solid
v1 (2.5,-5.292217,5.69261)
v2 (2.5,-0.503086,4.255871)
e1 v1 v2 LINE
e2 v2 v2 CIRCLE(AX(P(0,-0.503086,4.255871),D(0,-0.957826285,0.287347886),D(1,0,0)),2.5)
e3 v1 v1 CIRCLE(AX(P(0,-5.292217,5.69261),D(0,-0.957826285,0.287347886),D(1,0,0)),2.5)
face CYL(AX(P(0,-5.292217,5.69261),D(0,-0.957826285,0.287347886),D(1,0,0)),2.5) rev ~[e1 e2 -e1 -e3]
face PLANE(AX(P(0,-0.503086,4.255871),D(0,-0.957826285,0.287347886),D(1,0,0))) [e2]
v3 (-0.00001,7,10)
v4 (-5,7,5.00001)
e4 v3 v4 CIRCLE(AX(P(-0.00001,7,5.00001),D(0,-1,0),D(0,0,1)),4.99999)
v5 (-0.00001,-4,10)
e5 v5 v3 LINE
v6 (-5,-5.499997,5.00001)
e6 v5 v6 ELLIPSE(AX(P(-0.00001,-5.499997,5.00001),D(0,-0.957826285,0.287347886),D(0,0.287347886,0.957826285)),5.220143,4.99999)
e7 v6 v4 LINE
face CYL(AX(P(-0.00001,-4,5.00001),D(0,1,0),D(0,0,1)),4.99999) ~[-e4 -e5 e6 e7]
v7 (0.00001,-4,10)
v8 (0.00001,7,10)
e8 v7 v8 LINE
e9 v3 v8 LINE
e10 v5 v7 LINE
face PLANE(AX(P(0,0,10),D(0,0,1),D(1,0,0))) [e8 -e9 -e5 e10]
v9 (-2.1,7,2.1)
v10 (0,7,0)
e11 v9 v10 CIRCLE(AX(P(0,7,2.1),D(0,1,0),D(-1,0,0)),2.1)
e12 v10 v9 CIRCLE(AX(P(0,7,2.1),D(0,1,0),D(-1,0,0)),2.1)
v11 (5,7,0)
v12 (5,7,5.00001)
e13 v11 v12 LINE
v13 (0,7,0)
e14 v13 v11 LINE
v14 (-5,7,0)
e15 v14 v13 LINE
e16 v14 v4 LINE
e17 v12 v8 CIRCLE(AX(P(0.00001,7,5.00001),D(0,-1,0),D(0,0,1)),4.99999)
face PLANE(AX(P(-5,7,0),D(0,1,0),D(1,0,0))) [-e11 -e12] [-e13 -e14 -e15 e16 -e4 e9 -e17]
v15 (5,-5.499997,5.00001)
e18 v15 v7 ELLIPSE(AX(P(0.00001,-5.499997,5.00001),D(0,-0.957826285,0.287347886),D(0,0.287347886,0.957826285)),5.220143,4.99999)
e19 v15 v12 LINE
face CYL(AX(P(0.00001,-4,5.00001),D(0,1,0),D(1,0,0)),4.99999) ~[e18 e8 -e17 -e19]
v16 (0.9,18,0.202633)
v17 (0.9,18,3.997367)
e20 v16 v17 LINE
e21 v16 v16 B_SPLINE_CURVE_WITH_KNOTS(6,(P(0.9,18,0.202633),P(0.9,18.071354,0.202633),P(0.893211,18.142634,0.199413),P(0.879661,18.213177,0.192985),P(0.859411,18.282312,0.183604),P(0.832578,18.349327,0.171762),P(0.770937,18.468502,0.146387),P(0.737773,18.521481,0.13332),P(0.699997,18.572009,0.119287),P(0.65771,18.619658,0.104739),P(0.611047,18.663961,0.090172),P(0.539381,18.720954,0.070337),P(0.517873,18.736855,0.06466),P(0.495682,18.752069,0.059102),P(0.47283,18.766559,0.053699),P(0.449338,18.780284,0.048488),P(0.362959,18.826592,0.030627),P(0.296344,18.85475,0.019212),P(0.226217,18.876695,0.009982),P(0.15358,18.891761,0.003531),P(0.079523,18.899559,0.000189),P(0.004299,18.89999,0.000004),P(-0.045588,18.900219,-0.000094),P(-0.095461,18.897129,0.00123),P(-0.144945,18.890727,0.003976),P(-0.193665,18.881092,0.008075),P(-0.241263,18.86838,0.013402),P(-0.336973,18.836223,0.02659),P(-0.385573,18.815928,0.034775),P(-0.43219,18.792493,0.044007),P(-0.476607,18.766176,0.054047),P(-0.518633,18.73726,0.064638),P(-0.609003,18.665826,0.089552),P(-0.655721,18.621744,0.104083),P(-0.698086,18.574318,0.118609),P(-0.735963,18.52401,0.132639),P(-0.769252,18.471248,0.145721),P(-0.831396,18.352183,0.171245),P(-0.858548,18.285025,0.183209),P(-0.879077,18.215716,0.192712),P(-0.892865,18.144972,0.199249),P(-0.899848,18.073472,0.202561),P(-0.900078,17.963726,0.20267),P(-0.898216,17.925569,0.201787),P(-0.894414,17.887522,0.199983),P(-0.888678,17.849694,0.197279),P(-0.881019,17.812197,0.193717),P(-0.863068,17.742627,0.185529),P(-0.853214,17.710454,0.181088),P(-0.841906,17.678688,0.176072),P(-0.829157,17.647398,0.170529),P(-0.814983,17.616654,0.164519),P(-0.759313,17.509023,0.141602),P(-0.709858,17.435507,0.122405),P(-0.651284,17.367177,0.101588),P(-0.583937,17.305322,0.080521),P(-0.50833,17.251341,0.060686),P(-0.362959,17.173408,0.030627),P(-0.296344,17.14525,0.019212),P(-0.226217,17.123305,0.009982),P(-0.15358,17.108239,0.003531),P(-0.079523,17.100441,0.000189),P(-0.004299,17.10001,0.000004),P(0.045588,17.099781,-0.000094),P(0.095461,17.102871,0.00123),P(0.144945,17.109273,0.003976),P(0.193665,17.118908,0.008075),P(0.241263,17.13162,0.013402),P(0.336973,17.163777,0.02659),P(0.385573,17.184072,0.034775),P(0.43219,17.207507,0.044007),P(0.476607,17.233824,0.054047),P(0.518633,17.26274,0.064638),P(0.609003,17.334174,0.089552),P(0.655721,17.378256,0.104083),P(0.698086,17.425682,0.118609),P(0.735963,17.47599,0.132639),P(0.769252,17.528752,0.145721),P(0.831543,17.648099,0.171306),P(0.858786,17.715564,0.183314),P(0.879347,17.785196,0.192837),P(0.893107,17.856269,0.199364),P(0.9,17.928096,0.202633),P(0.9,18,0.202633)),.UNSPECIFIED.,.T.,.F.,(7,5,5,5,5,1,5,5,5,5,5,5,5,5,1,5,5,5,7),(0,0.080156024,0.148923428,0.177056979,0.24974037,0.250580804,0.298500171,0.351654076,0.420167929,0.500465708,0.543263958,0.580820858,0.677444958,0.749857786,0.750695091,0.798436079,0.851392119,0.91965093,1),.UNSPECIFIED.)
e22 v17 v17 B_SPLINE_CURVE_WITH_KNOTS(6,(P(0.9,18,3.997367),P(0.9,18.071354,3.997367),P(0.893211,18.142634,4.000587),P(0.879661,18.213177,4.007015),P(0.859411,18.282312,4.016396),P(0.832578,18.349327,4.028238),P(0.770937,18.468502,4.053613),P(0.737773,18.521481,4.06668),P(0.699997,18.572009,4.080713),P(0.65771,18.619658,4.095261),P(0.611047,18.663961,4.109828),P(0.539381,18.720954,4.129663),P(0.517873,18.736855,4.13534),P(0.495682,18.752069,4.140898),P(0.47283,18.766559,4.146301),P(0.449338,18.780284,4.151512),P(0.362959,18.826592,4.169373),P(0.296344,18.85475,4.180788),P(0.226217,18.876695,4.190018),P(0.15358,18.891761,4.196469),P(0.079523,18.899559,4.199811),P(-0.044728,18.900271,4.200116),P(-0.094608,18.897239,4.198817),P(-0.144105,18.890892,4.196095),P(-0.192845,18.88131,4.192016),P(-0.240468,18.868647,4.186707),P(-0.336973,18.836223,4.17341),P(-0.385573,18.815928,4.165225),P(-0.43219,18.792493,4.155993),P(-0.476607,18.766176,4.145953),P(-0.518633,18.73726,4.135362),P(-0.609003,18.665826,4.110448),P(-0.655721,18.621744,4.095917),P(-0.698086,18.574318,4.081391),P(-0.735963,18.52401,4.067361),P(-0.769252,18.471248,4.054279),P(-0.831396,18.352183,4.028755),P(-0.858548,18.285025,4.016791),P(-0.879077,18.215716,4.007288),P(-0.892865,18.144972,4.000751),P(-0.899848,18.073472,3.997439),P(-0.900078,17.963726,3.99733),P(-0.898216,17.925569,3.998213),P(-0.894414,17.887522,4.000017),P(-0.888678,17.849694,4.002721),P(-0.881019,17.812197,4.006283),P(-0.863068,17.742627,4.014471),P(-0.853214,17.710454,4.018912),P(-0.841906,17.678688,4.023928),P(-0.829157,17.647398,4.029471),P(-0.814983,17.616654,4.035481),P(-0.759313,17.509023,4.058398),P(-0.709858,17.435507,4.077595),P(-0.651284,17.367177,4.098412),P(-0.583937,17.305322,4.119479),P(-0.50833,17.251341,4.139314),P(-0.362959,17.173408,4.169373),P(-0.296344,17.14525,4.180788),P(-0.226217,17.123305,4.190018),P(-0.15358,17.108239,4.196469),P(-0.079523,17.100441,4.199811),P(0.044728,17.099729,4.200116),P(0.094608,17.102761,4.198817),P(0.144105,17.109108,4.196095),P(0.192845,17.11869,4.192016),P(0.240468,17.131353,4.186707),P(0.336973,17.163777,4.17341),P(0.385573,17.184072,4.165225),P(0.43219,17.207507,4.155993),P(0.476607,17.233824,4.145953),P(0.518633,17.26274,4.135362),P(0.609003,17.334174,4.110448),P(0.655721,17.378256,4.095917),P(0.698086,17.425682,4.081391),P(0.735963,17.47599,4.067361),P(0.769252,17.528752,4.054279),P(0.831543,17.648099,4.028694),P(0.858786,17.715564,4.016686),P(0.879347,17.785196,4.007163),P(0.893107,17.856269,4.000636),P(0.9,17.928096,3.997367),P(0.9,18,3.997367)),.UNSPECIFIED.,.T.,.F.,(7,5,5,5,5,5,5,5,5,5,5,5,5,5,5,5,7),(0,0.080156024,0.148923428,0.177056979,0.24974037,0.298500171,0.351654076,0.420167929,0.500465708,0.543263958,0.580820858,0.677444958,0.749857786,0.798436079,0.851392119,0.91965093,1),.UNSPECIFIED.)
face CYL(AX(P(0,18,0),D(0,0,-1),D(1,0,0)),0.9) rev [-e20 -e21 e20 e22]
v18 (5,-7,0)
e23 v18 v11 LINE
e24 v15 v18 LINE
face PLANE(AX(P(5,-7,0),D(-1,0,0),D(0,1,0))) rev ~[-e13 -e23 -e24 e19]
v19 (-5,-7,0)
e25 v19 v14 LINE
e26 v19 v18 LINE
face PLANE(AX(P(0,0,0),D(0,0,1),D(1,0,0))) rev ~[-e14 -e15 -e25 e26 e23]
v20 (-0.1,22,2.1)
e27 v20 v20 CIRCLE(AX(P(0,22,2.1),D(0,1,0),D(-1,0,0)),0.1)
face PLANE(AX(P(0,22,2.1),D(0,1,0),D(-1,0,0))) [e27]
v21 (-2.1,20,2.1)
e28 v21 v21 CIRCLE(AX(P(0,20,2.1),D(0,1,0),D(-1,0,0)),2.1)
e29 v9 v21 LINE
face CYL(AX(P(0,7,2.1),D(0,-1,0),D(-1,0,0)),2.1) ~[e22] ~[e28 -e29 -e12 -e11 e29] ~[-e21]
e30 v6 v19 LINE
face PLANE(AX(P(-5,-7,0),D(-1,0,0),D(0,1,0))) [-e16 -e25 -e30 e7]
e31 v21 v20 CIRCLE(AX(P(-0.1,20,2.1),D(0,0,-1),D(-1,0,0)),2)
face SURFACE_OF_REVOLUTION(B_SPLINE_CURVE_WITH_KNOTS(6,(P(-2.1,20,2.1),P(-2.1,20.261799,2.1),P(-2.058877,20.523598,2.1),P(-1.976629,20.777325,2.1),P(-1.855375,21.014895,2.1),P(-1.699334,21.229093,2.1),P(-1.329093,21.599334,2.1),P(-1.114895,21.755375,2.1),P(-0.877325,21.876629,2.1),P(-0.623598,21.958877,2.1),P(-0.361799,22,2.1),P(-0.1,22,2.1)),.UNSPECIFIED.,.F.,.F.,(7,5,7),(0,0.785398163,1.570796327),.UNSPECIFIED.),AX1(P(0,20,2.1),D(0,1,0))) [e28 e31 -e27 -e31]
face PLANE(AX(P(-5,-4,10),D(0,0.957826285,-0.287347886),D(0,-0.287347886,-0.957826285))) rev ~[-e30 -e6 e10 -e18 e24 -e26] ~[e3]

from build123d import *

# Parameters (mm, degrees)
F0_W      = 10
F0_H      = 14
F1_DEPTH  = 10
F2_R      = 2.1
F3_DEPTH  = 15
F4_R      = 0.9
F5_DEPTH  = 5
F6_R      = 2
F8_DEPTH  = 10
F9_R      = 2.5
F10_DEPTH = 5
F11_R     = 4.99999


# Not quite as in the source:
# - a fillet or chamfer is up to 0.001 mm smaller than in the source, because OpenCascade refuses the exact size


with BuildPart() as f1:
    # F0 (on Top) → F1 (new body)
    with BuildSketch(Plane.XY):
        Rectangle(F0_W, F0_H)
    extrude(amount=F1_DEPTH)

    # F2 (on face) → F3 (join)
    with BuildSketch(Plane(origin=(0, 7, 0), x_dir=(-1, 0, 0), z_dir=(0, 1, 0))):
        with Locations((0, 2.1)):
            Circle(F2_R)
    extrude(amount=F3_DEPTH)

    # F4 (on Top) → F5 (cut)
    with BuildSketch(Plane.XY):
        with Locations((0, 18)):
            Circle(F4_R)
    extrude(amount=F5_DEPTH, mode=Mode.SUBTRACT)

    # F6
    f6_edges = [f1.edges().sort_by_distance(p)[0] for p in [
        (2.1, 22, 2.1),
    ]]
    fillet(f6_edges, radius=F6_R)

    # F7 (on face) → F8 (cut)
    with BuildSketch(Plane(origin=(-5, 0, 0), x_dir=(0, -1, 0), z_dir=(-1, 0, 0))):
        Polygon((4, 10), (7, 0), (7, 10), align=None)
    extrude(amount=-F8_DEPTH, mode=Mode.SUBTRACT)

    # F9 (on face) → F10 (cut)
    with BuildSketch(Plane(origin=(0, -6.4220183486, 1.9266055046), x_dir=(1, 0, 0), z_dir=(0, -0.9578262852, 0.2873478856))):
        with Locations((0, 3.9318241179)):
            Circle(F9_R)
    extrude(amount=-F10_DEPTH, mode=Mode.SUBTRACT)

    # F11 (radius 5 in the source; OpenCascade refuses exactly that, so slightly less here)
    f11_edges = [f1.edges().sort_by_distance(p)[0] for p in [
        (-5, 1.5, 10),
        (5, 1.5, 10),
    ]]
    fillet(f11_edges, radius=F11_R)


solid = f1.part
